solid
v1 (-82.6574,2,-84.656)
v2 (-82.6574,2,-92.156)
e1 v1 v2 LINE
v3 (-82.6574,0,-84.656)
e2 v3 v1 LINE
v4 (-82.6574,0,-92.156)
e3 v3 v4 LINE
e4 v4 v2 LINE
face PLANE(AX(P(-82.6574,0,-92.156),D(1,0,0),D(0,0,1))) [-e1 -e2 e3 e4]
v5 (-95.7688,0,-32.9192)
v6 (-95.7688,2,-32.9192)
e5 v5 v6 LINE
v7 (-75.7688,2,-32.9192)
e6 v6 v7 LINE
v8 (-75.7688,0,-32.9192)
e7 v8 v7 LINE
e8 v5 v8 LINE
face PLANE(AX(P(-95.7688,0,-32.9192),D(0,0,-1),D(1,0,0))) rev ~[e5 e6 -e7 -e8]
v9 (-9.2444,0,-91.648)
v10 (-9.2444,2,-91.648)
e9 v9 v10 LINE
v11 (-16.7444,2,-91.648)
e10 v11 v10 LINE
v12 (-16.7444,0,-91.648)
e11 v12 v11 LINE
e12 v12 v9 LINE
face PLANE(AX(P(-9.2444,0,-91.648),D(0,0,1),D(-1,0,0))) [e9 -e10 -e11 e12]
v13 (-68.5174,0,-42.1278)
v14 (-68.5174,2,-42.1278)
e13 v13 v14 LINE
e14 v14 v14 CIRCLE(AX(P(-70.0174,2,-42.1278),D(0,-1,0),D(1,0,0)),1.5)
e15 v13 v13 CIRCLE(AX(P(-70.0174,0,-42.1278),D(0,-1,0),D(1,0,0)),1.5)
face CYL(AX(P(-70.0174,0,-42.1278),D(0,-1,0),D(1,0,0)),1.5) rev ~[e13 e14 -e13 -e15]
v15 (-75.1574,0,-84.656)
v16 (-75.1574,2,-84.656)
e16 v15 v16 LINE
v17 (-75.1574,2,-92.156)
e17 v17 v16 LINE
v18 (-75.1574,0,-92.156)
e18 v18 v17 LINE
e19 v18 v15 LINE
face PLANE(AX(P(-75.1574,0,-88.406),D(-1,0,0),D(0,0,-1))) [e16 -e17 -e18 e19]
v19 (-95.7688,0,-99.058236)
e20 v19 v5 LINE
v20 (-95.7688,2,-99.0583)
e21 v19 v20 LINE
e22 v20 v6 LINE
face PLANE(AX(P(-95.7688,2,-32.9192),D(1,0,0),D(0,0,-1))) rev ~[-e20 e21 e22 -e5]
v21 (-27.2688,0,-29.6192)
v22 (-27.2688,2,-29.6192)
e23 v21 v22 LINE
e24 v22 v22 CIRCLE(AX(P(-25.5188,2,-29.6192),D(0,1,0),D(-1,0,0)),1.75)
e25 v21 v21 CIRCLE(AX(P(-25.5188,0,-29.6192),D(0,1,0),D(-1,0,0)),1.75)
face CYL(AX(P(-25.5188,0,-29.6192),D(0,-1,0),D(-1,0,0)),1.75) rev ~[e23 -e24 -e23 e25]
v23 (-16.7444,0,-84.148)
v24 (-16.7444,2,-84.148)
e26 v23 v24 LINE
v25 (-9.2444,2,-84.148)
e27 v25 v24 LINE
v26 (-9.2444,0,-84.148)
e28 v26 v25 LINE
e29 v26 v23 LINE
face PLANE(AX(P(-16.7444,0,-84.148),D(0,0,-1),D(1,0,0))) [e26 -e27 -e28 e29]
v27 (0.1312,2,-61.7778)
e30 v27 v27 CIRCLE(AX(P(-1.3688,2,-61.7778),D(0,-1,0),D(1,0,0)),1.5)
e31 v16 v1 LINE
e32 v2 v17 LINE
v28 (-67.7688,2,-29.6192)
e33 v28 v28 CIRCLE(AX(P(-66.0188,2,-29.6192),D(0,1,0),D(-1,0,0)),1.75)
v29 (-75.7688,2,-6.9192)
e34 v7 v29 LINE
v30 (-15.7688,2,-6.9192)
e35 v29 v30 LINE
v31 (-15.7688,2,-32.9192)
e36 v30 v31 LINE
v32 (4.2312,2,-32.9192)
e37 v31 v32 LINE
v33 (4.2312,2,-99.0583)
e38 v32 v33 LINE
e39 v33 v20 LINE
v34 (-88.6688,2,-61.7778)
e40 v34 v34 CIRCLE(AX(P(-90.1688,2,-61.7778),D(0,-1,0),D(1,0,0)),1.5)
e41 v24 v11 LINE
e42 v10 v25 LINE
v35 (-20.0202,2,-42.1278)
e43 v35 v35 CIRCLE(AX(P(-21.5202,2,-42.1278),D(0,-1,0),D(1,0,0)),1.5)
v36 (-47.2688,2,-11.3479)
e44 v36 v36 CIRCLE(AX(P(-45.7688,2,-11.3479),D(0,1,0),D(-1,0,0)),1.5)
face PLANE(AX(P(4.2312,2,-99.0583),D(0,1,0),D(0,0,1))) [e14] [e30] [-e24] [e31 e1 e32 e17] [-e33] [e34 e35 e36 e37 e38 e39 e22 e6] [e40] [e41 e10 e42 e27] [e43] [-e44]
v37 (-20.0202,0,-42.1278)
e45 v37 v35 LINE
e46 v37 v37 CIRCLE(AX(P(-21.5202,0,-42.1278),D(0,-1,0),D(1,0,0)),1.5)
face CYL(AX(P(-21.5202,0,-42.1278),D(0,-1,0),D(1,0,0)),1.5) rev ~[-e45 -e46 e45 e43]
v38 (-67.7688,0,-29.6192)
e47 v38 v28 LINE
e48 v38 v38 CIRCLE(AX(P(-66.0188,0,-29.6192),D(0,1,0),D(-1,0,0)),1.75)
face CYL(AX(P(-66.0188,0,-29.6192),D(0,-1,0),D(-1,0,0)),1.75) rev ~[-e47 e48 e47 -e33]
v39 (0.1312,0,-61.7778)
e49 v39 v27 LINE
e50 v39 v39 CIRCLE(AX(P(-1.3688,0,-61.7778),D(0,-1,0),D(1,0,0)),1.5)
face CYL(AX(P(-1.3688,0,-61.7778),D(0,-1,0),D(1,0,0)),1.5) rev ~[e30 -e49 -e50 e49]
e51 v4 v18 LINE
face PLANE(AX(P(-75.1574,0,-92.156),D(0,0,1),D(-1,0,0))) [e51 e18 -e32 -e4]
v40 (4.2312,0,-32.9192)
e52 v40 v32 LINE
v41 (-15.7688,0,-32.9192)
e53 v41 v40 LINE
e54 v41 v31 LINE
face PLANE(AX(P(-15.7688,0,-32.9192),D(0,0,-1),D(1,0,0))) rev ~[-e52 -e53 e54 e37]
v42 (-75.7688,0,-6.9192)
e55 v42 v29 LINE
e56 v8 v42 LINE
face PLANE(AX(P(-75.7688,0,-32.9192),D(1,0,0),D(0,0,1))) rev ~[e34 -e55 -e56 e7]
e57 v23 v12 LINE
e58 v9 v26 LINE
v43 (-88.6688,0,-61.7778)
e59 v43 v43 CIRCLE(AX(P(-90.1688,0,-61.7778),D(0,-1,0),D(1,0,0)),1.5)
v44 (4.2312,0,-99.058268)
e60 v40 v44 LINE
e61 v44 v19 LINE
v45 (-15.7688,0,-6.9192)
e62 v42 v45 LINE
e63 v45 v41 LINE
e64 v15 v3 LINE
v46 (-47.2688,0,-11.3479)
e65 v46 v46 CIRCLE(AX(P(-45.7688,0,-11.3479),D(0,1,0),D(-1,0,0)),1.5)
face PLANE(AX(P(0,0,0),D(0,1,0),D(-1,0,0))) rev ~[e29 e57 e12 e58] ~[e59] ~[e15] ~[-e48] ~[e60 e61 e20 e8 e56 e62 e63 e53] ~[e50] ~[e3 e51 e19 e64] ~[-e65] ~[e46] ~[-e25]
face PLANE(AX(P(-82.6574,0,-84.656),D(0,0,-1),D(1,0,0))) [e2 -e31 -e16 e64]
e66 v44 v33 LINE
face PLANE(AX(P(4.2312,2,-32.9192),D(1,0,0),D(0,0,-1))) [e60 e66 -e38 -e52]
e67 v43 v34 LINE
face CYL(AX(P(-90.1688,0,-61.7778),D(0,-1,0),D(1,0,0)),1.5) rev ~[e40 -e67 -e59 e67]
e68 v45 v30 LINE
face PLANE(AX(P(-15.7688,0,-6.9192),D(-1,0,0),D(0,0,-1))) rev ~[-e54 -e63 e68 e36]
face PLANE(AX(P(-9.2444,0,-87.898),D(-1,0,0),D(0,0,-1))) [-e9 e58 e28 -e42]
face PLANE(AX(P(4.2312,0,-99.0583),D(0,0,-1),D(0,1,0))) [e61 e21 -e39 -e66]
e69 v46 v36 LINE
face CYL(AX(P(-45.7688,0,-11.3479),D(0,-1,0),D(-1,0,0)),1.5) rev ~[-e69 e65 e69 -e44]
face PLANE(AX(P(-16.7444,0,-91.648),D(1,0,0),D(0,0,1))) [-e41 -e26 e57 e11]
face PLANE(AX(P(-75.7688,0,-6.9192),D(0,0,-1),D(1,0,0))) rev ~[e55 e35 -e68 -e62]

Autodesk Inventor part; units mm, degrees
ref_plane "YZ Plane" through (0, 0, 0) normal (1, 0, 0) x (0, 1, 0)
ref_plane "XZ Plane" through (0, 0, 0) normal (0, 1, 0) x (-1, 0, 0)
ref_plane "XY Plane" through (0, 0, 0) normal (0, 0, 1) x (1, 0, 0)
sketch "Szkic1" plane through (0, 0, 0) normal (0, 1, 0) x (-1, 0, 0)
  circle A0 centre (45.7688, -11.3479) radius 1.5
  circle A1 centre (25.5188, -29.6192) radius 1.75
  circle A2 centre (66.0188, -29.6192) radius 1.75
  line L0 (-4.2312, -99.4192) -> (95.7688, -99.4192)
  line L1 (95.7688, -99.4192) -> (95.7688, -32.9192)
  line L2 (95.7688, -32.9192) -> (75.7688, -32.9192)
  line L3 (75.7688, -32.9192) -> (75.7688, -6.9192)
  line L4 (75.7688, -6.9192) -> (15.7688, -6.9192)
  line L5 (15.7688, -6.9192) -> (15.7688, -32.9192)
  line L6 (15.7688, -32.9192) -> (-4.2312, -32.9192)
  line L7 (-4.2312, -32.9192) -> (-4.2312, -99.4192)
  point P0 (0, 0)
  point P1 (0, 0)
extrude "Wyciągnięcie proste1" add sketch "Szkic1" along normal blind 2
sketch "Szkic2" plane through (0, 0, 0) normal (0, -1, 0) x (1, 0, 0)
  circle A0 centre (-1.3688, -61.7778) radius 1.5 projected
  circle A1 centre (-21.5202, -42.1278) radius 1.5 projected
  circle A2 centre (-70.0174, -42.1278) radius 1.5 projected
  circle A3 centre (-90.1688, -61.7778) radius 1.5 projected
  point P0 (0, 0)
extrude "Wyciągnięcie proste2" cut sketch "Szkic2" against normal blind 2
sketch "Szkic3" plane through (4.2312, 0, -32.9192) normal (1, 0, 0) x (0, 0, -1)
  line L0 (0, 0) -> (66.5, 0) projected
  line L1 (66.5, 0) -> (66.5, 2) projected
  line L2 (0, 2) -> (66.5, 2) projected
  line L3 (0, 0) -> (0, 2) projected
  line L4 (46.3508, 37) -> (66.9119, -1.4451) projected
  point P0 (-32.9192, 0)
  point P1 (65.0694, 2)
  point P2 (66.1391, 0)
extrude "Wyciągnięcie proste3" cut sketch "Szkic3" against normal through all contours L4 L2 L1 L0
sketch "Szkic4" plane through (0, 0, 0) normal (0, -1, 0) x (1, 0, 0)
  circle A0 centre (-11.7244, -89.168) radius 0.3048 projected
  circle A1 centre (-14.2644, -89.168) radius 0.3048 projected
  circle A2 centre (-14.2644, -86.628) radius 0.3048 projected
  circle A3 centre (-11.7244, -86.628) radius 0.3048 projected
  circle A4 centre (-80.1774, -89.676) radius 0.3048 projected
  circle A5 centre (-77.6374, -89.676) radius 0.3048 projected
  circle A6 centre (-77.6374, -87.136) radius 0.3048 projected
  circle A7 centre (-80.1774, -87.136) radius 0.3048 projected
  line L0 (-11.7244, -86.628) -> (-14.2644, -86.628)
  line L1 (-14.2644, -86.628) -> (-14.2644, -89.168)
  line L2 (-14.2644, -89.168) -> (-11.7244, -89.168)
  line L3 (-11.7244, -89.168) -> (-11.7244, -86.628)
  line L4 (-77.6374, -87.136) -> (-80.1774, -87.136)
  line L5 (-80.1774, -87.136) -> (-80.1774, -89.676)
  line L6 (-80.1774, -89.676) -> (-77.6374, -89.676)
  line L7 (-77.6374, -89.676) -> (-77.6374, -87.136)
  circle A8 centre (-78.9074, -88.406) radius 3.75
  circle A9 centre (-12.9944, -87.898) radius 3.75
  line L8 (-16.7444, -84.148) -> (-9.2444, -84.148)
  line L9 (-9.2444, -84.148) -> (-9.2444, -91.648)
  line L10 (-9.2444, -91.648) -> (-16.7444, -91.648)
  line L11 (-16.7444, -91.648) -> (-16.7444, -84.148)
  line L12 (-82.6574, -84.656) -> (-75.1574, -84.656)
  line L13 (-75.1574, -84.656) -> (-75.1574, -92.156)
  line L14 (-75.1574, -92.156) -> (-82.6574, -92.156)
  line L15 (-82.6574, -92.156) -> (-82.6574, -84.656)
  point P0 (0, 0)
  dimension "d6" = 7.5
  dimension "d7" = 7.5
extrude "Wyciągnięcie proste4" cut sketch "Szkic4" against normal through all contours A0 L2 L3 | L3 L2 A0 | A0 L2 A1 L1 A2 L0 A3 L3 | L3 L0 A3 | A3 L0 L3 | L2 L1 A1 | A1 L1 L2 | L0 L1 A2 | A2 L1 L0 | L6 L5 A4 | A4 L5 L6 | A4 L5 A7 L4 A6 L7 A5 L6 | L6 L7 A5 | A5 L7 L6 | L5 L4 A7 | A7 L4 L5 | L7 L4 A6 | A6 L4 L7 | A8 | L13 L14 A8 | A8 L12 L13 | A8 L15 L12 | L14 L15 A8 | A9 | L9 L10 A9 | A9 L8 L9 | A9 L11 L8 | L10 L11 A9
sketch "Szkic6" plane through (4.2312, 2, -32.9192) normal (1, 0, 0) x (0, 0, -1)
  line L0 (66.1391, -2) -> (65.0694, 0) projected
  line L1 (0, 0) -> (65.0694, 0) projected
  line L2 (0, -2) -> (0, 0) projected
  line L3 (66.1391, 0) -> (65, 0)
  line L4 (65, 0) -> (65, -3)
  line L5 (65, -3) -> (66.1391, -3)
  line L6 (66.1391, -3) -> (66.1391, 0)
  line L7 (0, -2) -> (66.1391, -2) projected
  point P0 (-32.9192, -2)
extrude "Wyciągnięcie proste6" add sketch "Szkic6" against normal blind 100 contours L0 L3 L6
properties part number "podstawa" material "Stal, węglowa"
